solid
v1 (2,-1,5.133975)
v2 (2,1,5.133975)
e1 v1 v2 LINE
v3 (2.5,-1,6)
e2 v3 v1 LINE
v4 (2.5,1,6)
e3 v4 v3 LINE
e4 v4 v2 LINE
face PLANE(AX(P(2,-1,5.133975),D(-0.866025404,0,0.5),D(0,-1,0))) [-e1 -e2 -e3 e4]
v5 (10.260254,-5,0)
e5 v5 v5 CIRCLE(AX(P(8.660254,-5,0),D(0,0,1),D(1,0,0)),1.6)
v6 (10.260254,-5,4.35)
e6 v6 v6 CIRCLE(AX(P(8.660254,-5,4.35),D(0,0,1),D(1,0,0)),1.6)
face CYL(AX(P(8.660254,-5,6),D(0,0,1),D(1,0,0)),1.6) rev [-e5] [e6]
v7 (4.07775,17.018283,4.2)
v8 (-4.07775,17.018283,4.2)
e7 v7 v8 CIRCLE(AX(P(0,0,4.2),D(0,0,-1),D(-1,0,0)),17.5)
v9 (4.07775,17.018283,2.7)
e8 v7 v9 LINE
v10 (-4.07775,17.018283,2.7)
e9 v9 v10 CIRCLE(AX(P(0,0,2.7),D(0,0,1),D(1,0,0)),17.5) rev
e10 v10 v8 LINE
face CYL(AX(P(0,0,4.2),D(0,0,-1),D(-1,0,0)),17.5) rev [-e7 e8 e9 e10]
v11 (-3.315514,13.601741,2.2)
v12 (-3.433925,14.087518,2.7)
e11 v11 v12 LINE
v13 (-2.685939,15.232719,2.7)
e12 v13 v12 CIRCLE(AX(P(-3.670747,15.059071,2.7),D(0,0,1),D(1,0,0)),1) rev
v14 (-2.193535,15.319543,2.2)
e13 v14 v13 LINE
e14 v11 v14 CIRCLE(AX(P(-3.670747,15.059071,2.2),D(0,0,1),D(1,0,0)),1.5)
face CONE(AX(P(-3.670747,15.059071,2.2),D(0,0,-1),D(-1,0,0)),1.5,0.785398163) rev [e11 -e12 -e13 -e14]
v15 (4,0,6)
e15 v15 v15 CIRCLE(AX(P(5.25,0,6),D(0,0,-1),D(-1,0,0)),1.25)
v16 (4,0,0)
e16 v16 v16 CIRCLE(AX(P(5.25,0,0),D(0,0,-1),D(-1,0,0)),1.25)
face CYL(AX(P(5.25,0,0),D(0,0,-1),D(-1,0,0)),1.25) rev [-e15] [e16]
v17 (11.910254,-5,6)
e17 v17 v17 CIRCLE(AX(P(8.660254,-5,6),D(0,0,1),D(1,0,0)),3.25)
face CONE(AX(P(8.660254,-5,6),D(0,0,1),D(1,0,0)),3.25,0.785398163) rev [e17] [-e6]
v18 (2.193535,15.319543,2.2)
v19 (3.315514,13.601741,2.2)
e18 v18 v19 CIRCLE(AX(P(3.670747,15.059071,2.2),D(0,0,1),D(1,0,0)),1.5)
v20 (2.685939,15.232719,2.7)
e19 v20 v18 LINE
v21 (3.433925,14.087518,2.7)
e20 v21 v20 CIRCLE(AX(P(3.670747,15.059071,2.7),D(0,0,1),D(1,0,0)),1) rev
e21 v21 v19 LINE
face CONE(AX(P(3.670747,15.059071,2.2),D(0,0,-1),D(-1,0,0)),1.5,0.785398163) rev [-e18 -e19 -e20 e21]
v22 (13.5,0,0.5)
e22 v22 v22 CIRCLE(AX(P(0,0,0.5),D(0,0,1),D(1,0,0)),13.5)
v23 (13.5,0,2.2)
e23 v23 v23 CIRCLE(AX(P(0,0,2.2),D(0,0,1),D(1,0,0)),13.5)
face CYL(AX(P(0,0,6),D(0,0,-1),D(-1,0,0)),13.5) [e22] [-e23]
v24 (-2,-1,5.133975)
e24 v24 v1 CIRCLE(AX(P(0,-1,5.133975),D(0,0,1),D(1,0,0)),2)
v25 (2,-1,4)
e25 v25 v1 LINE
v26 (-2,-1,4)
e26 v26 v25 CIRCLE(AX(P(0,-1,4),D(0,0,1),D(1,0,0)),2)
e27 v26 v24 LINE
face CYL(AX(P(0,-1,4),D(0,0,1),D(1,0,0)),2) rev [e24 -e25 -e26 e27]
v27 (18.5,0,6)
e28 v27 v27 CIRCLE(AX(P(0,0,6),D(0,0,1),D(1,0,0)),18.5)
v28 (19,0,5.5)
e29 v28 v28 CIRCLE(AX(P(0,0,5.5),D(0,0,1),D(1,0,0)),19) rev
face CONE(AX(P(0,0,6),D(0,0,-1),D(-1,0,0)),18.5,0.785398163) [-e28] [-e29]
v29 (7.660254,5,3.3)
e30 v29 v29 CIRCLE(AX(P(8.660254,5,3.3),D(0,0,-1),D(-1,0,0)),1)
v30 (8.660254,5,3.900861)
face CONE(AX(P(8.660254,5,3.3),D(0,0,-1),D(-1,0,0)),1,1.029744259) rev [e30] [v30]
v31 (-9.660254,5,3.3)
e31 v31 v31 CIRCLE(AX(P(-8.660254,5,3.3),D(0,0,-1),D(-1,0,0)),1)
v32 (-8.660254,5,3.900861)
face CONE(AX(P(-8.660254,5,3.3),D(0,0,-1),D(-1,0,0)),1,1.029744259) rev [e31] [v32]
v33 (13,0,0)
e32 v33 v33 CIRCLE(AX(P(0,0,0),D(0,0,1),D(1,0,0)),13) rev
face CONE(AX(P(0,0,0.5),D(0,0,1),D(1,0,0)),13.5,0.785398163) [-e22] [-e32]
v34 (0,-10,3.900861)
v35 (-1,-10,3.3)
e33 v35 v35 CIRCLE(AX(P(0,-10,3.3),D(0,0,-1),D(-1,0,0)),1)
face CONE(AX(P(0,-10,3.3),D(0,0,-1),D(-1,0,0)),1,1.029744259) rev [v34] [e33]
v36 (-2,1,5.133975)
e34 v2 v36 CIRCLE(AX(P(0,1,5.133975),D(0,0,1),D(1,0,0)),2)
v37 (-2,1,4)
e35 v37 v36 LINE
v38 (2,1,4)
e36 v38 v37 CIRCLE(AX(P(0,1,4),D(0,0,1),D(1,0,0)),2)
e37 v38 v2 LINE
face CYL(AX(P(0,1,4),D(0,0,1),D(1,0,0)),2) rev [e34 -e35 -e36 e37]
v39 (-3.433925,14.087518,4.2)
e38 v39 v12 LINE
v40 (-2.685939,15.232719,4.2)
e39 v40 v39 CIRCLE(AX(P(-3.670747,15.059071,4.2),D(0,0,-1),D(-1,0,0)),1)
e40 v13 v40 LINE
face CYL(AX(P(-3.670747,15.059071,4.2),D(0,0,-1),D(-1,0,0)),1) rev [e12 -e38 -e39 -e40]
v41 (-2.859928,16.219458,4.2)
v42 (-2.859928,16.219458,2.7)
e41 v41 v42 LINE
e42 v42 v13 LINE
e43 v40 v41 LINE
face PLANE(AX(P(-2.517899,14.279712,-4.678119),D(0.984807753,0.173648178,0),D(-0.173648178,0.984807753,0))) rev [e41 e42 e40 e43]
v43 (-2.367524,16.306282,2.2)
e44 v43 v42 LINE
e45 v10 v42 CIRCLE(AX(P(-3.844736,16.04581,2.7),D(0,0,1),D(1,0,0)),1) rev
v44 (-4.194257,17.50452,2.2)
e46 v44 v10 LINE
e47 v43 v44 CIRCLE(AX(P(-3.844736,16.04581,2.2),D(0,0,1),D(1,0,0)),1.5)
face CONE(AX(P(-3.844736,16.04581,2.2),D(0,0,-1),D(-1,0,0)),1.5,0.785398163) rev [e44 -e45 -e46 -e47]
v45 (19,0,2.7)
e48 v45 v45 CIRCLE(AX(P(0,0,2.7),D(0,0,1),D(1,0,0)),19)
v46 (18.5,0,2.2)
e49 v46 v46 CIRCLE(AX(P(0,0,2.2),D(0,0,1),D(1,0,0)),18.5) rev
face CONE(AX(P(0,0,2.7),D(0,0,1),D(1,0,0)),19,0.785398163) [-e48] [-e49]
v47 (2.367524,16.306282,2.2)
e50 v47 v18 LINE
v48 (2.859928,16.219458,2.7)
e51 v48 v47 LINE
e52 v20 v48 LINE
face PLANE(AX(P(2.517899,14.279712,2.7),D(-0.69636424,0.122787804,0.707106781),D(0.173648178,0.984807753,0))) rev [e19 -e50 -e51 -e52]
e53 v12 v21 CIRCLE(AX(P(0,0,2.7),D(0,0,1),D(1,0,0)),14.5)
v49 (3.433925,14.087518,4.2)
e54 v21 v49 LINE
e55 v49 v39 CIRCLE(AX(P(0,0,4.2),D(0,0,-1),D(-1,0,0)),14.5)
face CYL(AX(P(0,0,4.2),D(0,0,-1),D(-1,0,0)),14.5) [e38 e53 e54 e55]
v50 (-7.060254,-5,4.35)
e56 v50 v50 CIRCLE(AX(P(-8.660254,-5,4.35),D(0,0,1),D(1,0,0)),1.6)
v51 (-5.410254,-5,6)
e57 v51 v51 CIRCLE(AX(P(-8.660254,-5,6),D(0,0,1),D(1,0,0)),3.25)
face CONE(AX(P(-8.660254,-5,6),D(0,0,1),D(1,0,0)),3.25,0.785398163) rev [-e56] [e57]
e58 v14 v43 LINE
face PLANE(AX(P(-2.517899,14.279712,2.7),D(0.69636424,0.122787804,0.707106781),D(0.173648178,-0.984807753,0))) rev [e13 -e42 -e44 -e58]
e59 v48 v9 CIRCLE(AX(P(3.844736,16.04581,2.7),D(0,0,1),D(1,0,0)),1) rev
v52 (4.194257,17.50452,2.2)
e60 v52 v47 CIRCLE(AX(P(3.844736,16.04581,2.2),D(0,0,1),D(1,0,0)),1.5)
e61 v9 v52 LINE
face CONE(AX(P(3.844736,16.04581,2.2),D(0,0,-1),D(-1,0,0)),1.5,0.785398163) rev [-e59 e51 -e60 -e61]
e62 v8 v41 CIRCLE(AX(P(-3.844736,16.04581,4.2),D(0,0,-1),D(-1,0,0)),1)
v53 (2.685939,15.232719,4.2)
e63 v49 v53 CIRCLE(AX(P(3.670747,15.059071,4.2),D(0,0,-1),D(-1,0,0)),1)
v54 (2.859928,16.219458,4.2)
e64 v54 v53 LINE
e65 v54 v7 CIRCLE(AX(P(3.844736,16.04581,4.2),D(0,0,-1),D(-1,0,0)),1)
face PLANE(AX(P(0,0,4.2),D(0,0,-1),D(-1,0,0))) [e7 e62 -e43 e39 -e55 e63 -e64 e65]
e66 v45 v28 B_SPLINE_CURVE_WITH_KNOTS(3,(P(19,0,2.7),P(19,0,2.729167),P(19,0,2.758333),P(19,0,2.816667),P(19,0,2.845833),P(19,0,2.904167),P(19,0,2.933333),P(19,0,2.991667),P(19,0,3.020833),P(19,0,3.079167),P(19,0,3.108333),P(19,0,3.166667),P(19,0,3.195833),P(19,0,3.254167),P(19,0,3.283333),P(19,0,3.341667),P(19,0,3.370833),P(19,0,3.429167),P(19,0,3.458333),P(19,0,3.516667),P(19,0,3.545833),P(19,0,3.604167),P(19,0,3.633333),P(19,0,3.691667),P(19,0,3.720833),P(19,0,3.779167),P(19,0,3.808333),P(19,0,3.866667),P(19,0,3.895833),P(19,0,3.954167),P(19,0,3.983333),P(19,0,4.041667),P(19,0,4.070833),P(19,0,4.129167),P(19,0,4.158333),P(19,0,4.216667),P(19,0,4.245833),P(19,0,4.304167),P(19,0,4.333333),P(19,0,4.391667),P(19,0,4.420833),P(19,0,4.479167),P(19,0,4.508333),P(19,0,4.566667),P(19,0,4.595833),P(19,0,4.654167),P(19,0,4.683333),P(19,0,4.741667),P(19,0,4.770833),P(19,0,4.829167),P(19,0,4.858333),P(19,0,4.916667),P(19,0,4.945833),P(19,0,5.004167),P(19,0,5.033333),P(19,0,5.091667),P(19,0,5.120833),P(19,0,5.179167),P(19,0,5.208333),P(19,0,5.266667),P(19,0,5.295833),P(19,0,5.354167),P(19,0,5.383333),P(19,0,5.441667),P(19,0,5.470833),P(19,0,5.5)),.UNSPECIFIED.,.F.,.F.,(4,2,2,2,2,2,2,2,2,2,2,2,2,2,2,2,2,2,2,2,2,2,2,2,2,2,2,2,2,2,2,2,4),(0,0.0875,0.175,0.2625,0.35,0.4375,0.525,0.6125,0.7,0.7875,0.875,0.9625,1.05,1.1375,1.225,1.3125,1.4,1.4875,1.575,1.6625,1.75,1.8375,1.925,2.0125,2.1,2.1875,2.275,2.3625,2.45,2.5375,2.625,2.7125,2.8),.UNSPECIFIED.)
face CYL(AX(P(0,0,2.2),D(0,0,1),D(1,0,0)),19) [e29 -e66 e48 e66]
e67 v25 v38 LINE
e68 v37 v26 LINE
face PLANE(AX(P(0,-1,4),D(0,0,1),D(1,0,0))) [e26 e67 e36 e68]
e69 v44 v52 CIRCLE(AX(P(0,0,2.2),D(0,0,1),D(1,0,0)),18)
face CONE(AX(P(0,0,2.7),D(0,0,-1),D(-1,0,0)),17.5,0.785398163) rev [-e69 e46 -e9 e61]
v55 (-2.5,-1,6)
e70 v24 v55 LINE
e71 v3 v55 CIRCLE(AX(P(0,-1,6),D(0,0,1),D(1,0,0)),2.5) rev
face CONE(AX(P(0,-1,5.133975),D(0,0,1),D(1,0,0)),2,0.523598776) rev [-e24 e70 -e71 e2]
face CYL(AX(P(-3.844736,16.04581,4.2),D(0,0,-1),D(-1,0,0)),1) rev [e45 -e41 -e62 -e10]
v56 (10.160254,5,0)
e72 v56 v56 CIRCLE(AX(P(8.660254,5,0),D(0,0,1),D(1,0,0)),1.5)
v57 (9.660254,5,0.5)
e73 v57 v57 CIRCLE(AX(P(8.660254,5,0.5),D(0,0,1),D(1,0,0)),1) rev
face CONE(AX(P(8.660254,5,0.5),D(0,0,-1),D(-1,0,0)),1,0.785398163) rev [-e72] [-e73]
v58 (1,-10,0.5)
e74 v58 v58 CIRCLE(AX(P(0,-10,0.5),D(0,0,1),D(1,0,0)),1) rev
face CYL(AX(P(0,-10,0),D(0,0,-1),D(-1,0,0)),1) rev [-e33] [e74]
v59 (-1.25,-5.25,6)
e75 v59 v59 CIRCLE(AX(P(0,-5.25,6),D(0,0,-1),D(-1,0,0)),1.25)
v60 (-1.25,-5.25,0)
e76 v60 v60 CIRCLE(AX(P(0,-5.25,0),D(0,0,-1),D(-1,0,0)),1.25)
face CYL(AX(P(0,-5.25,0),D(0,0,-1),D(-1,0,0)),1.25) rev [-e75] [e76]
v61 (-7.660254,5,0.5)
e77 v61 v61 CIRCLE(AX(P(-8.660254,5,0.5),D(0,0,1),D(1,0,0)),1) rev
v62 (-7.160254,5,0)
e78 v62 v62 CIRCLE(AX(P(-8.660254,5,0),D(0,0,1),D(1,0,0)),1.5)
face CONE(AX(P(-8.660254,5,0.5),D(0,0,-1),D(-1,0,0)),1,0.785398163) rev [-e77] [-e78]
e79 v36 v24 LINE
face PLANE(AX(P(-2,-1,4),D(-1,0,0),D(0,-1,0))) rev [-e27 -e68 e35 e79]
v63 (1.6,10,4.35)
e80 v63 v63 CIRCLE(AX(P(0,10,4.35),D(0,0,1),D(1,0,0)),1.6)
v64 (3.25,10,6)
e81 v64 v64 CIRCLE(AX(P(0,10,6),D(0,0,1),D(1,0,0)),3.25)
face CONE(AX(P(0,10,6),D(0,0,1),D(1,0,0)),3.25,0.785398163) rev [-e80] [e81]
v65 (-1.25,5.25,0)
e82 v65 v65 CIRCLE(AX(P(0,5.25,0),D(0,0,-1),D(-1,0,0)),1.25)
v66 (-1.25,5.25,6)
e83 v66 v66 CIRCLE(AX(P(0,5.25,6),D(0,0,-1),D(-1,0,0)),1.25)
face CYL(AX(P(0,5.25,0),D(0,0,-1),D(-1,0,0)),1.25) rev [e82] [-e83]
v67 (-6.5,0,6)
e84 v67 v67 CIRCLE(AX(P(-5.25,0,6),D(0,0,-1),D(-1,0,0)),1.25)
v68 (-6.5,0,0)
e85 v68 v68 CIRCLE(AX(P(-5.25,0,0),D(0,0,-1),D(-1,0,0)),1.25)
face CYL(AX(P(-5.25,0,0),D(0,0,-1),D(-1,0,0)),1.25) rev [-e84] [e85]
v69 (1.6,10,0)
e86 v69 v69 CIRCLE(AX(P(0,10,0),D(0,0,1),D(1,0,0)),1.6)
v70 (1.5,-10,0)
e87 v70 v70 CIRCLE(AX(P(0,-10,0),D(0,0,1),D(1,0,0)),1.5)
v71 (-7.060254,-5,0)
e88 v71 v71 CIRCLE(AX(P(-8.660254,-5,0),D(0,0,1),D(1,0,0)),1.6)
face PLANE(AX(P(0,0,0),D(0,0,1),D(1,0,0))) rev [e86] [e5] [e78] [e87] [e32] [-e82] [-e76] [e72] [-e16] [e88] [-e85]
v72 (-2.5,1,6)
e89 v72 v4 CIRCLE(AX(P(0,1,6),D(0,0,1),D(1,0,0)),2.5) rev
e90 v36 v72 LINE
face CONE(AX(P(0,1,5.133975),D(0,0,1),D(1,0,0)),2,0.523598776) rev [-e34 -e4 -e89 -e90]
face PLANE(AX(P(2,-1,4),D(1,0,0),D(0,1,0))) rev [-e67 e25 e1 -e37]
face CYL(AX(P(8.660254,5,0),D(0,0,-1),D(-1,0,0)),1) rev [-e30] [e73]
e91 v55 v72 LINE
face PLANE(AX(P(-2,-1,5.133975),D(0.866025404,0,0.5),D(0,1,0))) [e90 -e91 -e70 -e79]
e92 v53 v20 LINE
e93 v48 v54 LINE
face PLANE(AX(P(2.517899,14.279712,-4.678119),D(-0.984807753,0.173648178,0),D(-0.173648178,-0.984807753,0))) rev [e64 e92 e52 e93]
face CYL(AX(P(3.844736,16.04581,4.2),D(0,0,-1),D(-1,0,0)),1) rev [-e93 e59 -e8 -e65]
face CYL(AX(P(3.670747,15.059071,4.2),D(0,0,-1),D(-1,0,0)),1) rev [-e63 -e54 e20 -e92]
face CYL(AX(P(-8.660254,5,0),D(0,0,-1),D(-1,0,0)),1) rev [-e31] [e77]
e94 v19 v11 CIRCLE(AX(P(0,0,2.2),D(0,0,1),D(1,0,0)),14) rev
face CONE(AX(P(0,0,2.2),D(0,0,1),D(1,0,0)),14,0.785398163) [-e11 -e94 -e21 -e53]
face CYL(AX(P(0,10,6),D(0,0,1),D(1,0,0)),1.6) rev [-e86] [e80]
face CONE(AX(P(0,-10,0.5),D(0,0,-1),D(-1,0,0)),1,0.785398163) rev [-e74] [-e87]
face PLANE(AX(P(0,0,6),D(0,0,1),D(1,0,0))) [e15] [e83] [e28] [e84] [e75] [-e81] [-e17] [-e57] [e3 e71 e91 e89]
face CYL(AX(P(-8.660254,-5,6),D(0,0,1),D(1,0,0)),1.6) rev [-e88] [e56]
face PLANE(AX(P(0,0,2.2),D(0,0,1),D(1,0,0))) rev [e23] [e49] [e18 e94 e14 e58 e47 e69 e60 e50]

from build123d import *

# Parameters (mm, degrees)
SKETCH_1_R                   = 13.5
EXTRUDE_1_DEPTH              = 6
EXTRUDE_START                = -3.8
SKETCH_2_R                   = 19
SKETCH_2_R_2                 = 13.5
EXTRUDE_2_DEPTH              = 3.8
HOLE_WIZARD_M3_1_D           = 3.2
HOLE_WIZARD_M3_1_DEPTH       = 7
HOLE_WIZARD_M3_1_CSINK_D     = 6.5
HOLE_WIZARD_M3_1_CSINK_ANGLE = 90
HOLE_WIZARD_M3_1_TIP         = 0.96137699
F_2_0MM_1_D                  = 2
F_2_0MM_1_DEPTH              = 3.3
F_2_0MM_1_TIP                = 0.600860619
HOLE_WIZARD_M3_1_2_OUTLINE_R = 1.25
HOLE_WIZARD_M3_1_2_DEPTH     = 6
CUT_EXTRUDE_1_DEPTH          = 2
SKETCH_12_R                  = 17.5
SKETCH_12_R_2                = 14.5
CUT_EXTRUDE_3_DEPTH          = 2
EXTRUDE_START_2              = 2
EXTRUDE_3_DEPTH              = 2
CHAMFER_1_SIZE               = 0.5
FILLET_2_R                   = 1
CHAMFER_2_SIZE               = 0.5
CHAMFER_2_SIZE2              = 0.866025404
CHAMFER_3_SIZE               = 0.5


# Read off the part's stored shape, not the designer's step: M3 螺纹孔1
with BuildPart() as part:
    # 草图1 → 凸台-拉伸1 (new body)
    with BuildSketch(Plane.XY):
        Circle(SKETCH_1_R)
    extrude(amount=EXTRUDE_1_DEPTH)

    # 草图2 → 凸台-拉伸2 (add)
    with BuildSketch(Plane.XY.offset(6).offset(EXTRUDE_START)):
        Circle(SKETCH_2_R)
        Circle(SKETCH_2_R_2, mode=Mode.SUBTRACT)
    extrude(amount=EXTRUDE_2_DEPTH)

    # Hole Wizard M3 _1
    with Locations(Plane.XY.offset(6)):
        with Locations((8.660254038, -5), (0, 10), (-8.660254038, -5)):
            CounterSinkHole(HOLE_WIZARD_M3_1_D / 2, HOLE_WIZARD_M3_1_CSINK_D / 2, depth=HOLE_WIZARD_M3_1_DEPTH, counter_sink_angle=HOLE_WIZARD_M3_1_CSINK_ANGLE)
            with Locations((0, 0, -(HOLE_WIZARD_M3_1_DEPTH + HOLE_WIZARD_M3_1_TIP / 2))):  # 118° drill point
                Cone(0, HOLE_WIZARD_M3_1_D / 2, HOLE_WIZARD_M3_1_TIP, mode=Mode.SUBTRACT)

    # Ø2.0mm 暗销孔1
    with Locations(Plane(origin=(0, 0, 0), x_dir=(-1, 0, 0), z_dir=(0, 0, -1))):
        with Locations((8.660254038, 5), (0, -10), (-8.660254038, 5)):
            Hole(F_2_0MM_1_D / 2, depth=F_2_0MM_1_DEPTH)
            with Locations((0, 0, -(F_2_0MM_1_DEPTH + F_2_0MM_1_TIP / 2))):  # 118° drill point
                Cone(0, F_2_0MM_1_D / 2, F_2_0MM_1_TIP, mode=Mode.SUBTRACT)

    # Hole Wizard M3 _1 2 outline → Hole Wizard M3 _1 2 (cut)
    with BuildSketch(Plane.XY):
        with Locations((5.25, 0)):
            Circle(HOLE_WIZARD_M3_1_2_OUTLINE_R)
        with Locations((0, -5.25)):
            Circle(HOLE_WIZARD_M3_1_2_OUTLINE_R)
        with Locations((-5.25, 0)):
            Circle(HOLE_WIZARD_M3_1_2_OUTLINE_R)
        with Locations((0, 5.25)):
            Circle(HOLE_WIZARD_M3_1_2_OUTLINE_R)
    extrude(amount=HOLE_WIZARD_M3_1_2_DEPTH, mode=Mode.SUBTRACT)

    # 草图10 → 切除-拉伸1 (cut)
    with BuildSketch(Plane.XY.offset(6)):
        with BuildLine():
            Line((-2, -1), (-2, 1))
            ThreePointArc((-2, 1), (0, 3), (2, 1))
            Line((2, 1), (2, -1))
            ThreePointArc((2, -1), (0, -3), (-2, -1))
        make_face()
    extrude(amount=-CUT_EXTRUDE_1_DEPTH, mode=Mode.SUBTRACT)

    # 草图12 → 切除-拉伸3 (cut)
    with BuildSketch(Plane(origin=(0, 0, 2.2), x_dir=(-1, 0, 0), z_dir=(0, 0, -1))):
        Circle(SKETCH_12_R)
        Circle(SKETCH_12_R_2, mode=Mode.SUBTRACT)
    extrude(amount=-CUT_EXTRUDE_3_DEPTH, mode=Mode.SUBTRACT)

    # 草图13 → 凸台-拉伸3 (add)
    with BuildSketch(Plane(origin=(0, 0, 4.2), x_dir=(-1, 0, 0), z_dir=(0, 0, -1)).offset(EXTRUDE_START_2)):
        with BuildLine():
            Line((-2.517898576, 14.279712419), (-3.038843109, 17.234135678))
            ThreePointArc((-3.038843109, 17.234135678), (0, 17.5), (3.038843109, 17.234135678))
            Line((3.038843109, 17.234135678), (2.517898576, 14.279712419))
            ThreePointArc((2.517898576, 14.279712419), (0, 14.5), (-2.517898576, 14.279712419))
        make_face()
    extrude(amount=-EXTRUDE_3_DEPTH)

    # 倒角1
    chamfer_1_edges = [part.edges().sort_by_distance(p)[0] for p in [
        (-9.660254038, 5, 0),
        (-1, -10, 0),
        (7.660254038, 5, 0),
    ]]
    chamfer(chamfer_1_edges, length=CHAMFER_1_SIZE)

    # 圆角2
    fillet_2_edges = [part.edges().sort_by_distance(p)[0] for p in [
        (3.038843109, 17.234135678, 3.2),
        (-3.038843109, 17.234135678, 3.2),
        (-2.517898576, 14.279712419, 3.2),
        (2.517898576, 14.279712419, 3.2),
    ]]
    fillet(fillet_2_edges, radius=FILLET_2_R)

    # 倒角2
    chamfer_2_edges = [part.edges().sort_by_distance(p)[0] for p in [
        (0, -3, 6),
        (2, 0, 6),
        (0, 3, 6),
        (-2, 0, 6),
    ]]
    chamfer_2_side = [part.faces().sort_by_distance(p)[0] for p in [
        (-18.462598846, 0, 6),
    ]]
    chamfer(chamfer_2_edges, length=CHAMFER_2_SIZE, length2=CHAMFER_2_SIZE2, reference=chamfer_2_side[0])

    # 倒角3
    chamfer_3_edges = [part.edges().sort_by_distance(p)[0] for p in [
        (-2.772933692, 15.726088432, 2.2),
        (0, -14.5, 2.2),
        (0, -17.5, 2.2),
        (2.772933692, 15.726088432, 2.2),
        (-2.833509711, 14.512231288, 2.2),
        (-3.296257199, 16.88197424, 2.2),
        (3.296257199, 16.88197424, 2.2),
        (2.833509711, 14.512231288, 2.2),
        (-13.5, 0, 0),
        (-19, 0, 2.2),
        (-19, 0, 6),
    ]]
    chamfer(chamfer_3_edges, length=CHAMFER_3_SIZE)


solid = part.part
